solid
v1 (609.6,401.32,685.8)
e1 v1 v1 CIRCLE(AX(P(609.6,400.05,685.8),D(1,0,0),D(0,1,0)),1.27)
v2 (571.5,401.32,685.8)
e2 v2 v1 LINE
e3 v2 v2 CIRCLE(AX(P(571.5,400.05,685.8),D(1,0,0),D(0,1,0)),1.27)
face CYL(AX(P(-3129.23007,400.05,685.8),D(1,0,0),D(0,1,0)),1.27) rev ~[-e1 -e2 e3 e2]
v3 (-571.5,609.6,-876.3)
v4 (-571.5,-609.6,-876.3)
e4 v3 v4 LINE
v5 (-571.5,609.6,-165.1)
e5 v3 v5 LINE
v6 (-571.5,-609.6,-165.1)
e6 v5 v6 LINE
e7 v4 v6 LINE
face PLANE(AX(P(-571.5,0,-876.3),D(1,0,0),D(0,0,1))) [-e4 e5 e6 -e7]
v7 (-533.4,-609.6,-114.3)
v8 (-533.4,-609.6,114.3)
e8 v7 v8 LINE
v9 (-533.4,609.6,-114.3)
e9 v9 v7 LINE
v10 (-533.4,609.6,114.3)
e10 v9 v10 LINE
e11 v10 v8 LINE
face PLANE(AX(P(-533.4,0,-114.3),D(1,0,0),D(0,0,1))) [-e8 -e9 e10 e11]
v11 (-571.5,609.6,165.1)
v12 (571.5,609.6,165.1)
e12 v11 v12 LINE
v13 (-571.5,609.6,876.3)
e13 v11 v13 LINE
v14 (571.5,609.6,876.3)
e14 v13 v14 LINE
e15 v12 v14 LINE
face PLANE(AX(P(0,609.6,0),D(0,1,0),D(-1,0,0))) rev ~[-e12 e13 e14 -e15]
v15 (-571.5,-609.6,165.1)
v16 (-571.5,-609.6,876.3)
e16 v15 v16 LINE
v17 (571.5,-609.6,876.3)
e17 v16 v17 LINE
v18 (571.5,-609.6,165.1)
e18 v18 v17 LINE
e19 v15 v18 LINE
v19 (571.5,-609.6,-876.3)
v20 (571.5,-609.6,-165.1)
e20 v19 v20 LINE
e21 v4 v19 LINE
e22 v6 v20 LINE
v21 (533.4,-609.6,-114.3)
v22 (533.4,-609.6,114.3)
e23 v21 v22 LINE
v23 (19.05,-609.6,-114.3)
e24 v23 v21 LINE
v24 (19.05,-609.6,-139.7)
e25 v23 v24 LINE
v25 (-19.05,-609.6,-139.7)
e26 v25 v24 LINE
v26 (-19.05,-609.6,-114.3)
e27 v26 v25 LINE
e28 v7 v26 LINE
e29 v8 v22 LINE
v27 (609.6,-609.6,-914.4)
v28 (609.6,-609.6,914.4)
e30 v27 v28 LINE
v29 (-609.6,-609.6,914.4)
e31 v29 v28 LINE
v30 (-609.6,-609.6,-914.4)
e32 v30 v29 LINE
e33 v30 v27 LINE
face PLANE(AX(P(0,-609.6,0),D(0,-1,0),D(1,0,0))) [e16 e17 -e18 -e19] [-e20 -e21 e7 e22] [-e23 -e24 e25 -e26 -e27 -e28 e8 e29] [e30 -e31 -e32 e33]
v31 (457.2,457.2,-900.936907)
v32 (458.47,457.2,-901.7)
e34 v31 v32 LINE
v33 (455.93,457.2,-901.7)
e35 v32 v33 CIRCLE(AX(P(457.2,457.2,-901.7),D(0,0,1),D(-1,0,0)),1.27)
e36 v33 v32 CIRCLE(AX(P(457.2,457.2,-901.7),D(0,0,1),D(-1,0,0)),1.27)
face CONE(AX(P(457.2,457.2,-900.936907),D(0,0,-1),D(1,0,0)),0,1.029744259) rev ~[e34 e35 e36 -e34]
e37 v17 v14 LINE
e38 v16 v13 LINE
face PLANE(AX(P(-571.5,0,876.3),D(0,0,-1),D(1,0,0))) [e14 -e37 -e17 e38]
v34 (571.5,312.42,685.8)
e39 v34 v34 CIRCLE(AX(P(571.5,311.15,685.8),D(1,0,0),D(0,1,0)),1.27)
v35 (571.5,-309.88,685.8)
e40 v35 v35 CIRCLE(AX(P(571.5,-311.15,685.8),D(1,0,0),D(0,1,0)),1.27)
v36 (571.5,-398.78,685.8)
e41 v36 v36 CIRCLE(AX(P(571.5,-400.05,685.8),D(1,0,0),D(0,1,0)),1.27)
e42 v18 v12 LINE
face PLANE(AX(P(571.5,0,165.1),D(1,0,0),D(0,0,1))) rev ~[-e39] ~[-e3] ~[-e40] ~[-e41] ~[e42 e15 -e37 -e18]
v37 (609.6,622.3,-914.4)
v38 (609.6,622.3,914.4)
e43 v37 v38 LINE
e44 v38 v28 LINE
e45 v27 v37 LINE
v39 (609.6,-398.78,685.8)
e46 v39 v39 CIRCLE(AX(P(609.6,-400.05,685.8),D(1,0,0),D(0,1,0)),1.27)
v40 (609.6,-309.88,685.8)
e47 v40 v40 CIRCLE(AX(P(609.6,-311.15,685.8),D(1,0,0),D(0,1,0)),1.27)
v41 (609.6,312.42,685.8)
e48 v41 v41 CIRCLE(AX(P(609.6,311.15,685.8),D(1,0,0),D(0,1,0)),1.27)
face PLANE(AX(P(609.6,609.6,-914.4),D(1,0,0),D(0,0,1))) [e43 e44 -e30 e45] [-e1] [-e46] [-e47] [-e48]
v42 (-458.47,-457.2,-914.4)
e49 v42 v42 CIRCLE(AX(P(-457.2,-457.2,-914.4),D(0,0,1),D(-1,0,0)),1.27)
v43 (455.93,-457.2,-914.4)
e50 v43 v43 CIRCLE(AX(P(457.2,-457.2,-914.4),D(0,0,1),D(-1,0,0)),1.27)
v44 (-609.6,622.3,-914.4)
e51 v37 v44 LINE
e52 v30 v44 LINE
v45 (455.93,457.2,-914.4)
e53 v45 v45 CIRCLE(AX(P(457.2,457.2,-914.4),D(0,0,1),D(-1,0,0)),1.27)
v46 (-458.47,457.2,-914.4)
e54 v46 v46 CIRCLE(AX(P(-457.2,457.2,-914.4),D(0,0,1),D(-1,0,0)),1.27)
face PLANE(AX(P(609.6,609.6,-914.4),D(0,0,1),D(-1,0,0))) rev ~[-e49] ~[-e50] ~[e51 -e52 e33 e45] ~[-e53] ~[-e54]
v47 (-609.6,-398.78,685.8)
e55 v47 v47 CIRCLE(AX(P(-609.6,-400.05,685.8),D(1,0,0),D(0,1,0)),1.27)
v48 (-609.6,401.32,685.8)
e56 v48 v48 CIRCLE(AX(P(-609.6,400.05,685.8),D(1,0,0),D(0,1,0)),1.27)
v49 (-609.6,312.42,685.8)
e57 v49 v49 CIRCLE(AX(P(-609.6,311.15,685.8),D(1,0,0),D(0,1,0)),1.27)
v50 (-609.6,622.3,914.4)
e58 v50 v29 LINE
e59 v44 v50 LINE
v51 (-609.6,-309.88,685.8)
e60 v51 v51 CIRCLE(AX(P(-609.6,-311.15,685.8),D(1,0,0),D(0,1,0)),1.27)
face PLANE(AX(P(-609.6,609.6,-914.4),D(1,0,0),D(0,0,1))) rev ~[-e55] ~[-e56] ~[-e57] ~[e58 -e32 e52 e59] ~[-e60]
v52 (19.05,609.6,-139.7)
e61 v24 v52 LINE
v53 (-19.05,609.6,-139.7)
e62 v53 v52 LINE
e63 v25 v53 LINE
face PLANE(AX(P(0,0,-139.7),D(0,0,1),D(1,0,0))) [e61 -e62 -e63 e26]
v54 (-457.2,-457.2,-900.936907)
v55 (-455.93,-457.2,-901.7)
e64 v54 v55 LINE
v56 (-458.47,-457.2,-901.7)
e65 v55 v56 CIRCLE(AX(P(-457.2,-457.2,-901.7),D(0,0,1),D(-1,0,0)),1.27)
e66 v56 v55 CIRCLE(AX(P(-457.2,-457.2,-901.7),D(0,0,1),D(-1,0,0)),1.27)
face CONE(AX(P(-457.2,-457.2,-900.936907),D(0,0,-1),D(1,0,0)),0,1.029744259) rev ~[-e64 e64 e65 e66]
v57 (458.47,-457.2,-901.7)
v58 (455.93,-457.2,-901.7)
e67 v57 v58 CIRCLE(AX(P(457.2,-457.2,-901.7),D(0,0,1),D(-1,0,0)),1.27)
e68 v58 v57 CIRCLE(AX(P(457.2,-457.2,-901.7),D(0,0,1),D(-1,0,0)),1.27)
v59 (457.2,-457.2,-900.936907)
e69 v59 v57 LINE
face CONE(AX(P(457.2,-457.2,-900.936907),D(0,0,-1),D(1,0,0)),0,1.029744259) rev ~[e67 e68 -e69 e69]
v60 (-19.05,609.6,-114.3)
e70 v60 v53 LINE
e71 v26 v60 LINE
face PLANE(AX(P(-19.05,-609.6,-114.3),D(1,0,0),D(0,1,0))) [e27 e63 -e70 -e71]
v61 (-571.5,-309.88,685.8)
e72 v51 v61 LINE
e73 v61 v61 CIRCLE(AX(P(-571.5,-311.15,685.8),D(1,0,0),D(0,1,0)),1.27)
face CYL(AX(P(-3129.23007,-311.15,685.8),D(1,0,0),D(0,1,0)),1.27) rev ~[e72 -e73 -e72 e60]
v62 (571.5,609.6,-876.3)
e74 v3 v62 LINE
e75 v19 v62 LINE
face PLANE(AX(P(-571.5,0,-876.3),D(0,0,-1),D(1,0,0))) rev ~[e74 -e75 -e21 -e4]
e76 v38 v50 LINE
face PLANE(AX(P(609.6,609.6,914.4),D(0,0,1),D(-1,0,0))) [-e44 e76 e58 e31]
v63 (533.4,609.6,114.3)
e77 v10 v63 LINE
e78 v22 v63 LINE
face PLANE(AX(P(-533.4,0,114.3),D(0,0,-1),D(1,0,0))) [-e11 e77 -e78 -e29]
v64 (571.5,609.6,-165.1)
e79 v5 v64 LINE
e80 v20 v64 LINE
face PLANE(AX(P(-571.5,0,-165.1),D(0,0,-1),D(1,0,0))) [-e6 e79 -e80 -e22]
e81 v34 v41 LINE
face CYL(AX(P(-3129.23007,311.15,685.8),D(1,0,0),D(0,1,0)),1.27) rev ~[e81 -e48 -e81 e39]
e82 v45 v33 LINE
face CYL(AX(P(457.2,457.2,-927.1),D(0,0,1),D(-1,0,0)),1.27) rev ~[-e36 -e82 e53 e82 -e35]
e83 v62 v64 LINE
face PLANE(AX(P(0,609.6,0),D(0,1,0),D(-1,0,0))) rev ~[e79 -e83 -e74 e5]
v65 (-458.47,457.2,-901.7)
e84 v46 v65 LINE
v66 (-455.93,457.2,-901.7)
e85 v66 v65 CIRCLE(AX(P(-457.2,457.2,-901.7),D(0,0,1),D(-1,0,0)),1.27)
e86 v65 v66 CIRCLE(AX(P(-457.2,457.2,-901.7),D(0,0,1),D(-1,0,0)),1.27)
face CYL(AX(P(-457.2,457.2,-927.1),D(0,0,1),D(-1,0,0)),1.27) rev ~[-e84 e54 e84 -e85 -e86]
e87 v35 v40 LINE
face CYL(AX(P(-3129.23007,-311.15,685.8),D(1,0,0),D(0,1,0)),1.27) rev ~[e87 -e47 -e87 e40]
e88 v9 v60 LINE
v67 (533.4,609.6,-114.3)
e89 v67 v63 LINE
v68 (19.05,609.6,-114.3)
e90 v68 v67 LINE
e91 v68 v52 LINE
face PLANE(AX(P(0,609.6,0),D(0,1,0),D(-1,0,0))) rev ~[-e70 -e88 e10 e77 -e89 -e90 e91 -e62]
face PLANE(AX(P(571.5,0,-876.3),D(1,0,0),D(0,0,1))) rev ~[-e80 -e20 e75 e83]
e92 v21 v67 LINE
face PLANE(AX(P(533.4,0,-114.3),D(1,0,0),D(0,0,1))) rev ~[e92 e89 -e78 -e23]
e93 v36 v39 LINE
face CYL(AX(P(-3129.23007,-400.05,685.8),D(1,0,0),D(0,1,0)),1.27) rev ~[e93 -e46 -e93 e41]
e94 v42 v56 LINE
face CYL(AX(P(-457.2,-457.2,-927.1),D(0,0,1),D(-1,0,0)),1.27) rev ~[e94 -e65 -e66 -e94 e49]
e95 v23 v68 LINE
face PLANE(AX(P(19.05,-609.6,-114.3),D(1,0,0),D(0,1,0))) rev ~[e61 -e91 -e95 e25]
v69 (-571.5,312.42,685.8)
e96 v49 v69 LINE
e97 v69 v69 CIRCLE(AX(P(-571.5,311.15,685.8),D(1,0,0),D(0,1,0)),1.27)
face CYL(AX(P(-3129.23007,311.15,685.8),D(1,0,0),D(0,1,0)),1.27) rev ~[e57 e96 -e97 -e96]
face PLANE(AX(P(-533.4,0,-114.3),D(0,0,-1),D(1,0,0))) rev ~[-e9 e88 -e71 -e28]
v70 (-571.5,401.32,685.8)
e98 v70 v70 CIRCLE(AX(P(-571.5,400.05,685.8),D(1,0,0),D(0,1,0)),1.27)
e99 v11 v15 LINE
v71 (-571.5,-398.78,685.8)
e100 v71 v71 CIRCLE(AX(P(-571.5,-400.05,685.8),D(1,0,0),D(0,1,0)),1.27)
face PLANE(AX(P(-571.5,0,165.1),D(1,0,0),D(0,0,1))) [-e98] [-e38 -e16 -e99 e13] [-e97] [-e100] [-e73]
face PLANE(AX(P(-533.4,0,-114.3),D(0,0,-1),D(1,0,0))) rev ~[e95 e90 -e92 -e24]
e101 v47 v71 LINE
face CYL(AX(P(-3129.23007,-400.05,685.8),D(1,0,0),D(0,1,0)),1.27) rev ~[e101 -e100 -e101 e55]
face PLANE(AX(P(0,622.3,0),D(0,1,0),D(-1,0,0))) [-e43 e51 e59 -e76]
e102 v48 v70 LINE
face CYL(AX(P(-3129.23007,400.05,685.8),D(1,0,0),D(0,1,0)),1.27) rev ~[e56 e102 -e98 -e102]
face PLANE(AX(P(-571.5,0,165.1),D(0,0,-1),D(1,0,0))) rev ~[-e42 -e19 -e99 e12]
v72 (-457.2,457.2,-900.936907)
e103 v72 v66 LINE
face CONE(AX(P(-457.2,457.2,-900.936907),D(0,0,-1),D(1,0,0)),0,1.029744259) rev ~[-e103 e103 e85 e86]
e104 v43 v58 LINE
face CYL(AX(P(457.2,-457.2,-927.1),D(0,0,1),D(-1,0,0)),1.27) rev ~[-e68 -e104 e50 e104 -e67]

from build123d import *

# Parameters (mm, degrees)
F0_W     = 1219.2
F0_H     = 1828.8
F0_W_2   = 1143
F0_H_2   = 711.2
F0_W_3   = 1066.8
F0_H_3   = 228.6
F1_DEPTH = 609.6
F2_W     = 1219.2
F2_H     = 1828.8
F3_DEPTH = 12.7
F5_D     = 2.54
F7_D     = 2.54
F7_DEPTH = 12.7
F7_TIP   = 0.7630929862
F8_W     = 38.1
F8_H     = 1219.2
F9_DEPTH = 25.4


# Not quite as in the source:
# - a feature names something its author has since deleted; it is built from what else it names


with BuildPart() as f1:
    # F0 (on Front) → F1 (new body, symmetric)
    with BuildSketch(Plane.XZ):
        Rectangle(F0_W, F0_H)
        with Locations((0, -520.7)):
            Rectangle(F0_W_2, F0_H_2, mode=Mode.SUBTRACT)
        Rectangle(F0_W_3, F0_H_3, mode=Mode.SUBTRACT)
        with Locations((0, 520.7)):
            Rectangle(F0_W_2, F0_H_2, mode=Mode.SUBTRACT)
    extrude(amount=F1_DEPTH, both=True)

    # F2 (on face) → F3 (join)
    with BuildSketch(Plane(origin=(0, 609.6, 0), x_dir=(-1, 0, 0), z_dir=(0, 1, 0))):
        Rectangle(F2_W, F2_H)
    extrude(amount=F3_DEPTH)

    # F5 (through all)
    with Locations(Plane(origin=(-609.6, 0, 0), x_dir=(0, -1, 0), z_dir=(-1, 0, 0))):
        with Locations((-400.05, 685.8), (-311.15, 685.8), (311.15, 685.8), (400.05, 685.8)):
            Hole(F5_D / 2)

    # F7
    with Locations(Plane(origin=(0, 0, -914.4), x_dir=(1, 0, 0), z_dir=(0, 0, -1))):
        with Locations((-457.2, 457.2), (457.2, 457.2), (457.2, -457.2), (-457.2, -457.2)):
            Hole(F7_D / 2, depth=F7_DEPTH)
            with Locations((0, 0, -(F7_DEPTH + F7_TIP / 2))):  # 118° drill point
                Cone(0, F7_D / 2, F7_TIP, mode=Mode.SUBTRACT)

    # F8 (on face) → F9 (cut)
    with BuildSketch(Plane.XY.offset(-114.3)):
        Rectangle(F8_W, F8_H)
    extrude(amount=-F9_DEPTH, mode=Mode.SUBTRACT)


solid = f1.part
